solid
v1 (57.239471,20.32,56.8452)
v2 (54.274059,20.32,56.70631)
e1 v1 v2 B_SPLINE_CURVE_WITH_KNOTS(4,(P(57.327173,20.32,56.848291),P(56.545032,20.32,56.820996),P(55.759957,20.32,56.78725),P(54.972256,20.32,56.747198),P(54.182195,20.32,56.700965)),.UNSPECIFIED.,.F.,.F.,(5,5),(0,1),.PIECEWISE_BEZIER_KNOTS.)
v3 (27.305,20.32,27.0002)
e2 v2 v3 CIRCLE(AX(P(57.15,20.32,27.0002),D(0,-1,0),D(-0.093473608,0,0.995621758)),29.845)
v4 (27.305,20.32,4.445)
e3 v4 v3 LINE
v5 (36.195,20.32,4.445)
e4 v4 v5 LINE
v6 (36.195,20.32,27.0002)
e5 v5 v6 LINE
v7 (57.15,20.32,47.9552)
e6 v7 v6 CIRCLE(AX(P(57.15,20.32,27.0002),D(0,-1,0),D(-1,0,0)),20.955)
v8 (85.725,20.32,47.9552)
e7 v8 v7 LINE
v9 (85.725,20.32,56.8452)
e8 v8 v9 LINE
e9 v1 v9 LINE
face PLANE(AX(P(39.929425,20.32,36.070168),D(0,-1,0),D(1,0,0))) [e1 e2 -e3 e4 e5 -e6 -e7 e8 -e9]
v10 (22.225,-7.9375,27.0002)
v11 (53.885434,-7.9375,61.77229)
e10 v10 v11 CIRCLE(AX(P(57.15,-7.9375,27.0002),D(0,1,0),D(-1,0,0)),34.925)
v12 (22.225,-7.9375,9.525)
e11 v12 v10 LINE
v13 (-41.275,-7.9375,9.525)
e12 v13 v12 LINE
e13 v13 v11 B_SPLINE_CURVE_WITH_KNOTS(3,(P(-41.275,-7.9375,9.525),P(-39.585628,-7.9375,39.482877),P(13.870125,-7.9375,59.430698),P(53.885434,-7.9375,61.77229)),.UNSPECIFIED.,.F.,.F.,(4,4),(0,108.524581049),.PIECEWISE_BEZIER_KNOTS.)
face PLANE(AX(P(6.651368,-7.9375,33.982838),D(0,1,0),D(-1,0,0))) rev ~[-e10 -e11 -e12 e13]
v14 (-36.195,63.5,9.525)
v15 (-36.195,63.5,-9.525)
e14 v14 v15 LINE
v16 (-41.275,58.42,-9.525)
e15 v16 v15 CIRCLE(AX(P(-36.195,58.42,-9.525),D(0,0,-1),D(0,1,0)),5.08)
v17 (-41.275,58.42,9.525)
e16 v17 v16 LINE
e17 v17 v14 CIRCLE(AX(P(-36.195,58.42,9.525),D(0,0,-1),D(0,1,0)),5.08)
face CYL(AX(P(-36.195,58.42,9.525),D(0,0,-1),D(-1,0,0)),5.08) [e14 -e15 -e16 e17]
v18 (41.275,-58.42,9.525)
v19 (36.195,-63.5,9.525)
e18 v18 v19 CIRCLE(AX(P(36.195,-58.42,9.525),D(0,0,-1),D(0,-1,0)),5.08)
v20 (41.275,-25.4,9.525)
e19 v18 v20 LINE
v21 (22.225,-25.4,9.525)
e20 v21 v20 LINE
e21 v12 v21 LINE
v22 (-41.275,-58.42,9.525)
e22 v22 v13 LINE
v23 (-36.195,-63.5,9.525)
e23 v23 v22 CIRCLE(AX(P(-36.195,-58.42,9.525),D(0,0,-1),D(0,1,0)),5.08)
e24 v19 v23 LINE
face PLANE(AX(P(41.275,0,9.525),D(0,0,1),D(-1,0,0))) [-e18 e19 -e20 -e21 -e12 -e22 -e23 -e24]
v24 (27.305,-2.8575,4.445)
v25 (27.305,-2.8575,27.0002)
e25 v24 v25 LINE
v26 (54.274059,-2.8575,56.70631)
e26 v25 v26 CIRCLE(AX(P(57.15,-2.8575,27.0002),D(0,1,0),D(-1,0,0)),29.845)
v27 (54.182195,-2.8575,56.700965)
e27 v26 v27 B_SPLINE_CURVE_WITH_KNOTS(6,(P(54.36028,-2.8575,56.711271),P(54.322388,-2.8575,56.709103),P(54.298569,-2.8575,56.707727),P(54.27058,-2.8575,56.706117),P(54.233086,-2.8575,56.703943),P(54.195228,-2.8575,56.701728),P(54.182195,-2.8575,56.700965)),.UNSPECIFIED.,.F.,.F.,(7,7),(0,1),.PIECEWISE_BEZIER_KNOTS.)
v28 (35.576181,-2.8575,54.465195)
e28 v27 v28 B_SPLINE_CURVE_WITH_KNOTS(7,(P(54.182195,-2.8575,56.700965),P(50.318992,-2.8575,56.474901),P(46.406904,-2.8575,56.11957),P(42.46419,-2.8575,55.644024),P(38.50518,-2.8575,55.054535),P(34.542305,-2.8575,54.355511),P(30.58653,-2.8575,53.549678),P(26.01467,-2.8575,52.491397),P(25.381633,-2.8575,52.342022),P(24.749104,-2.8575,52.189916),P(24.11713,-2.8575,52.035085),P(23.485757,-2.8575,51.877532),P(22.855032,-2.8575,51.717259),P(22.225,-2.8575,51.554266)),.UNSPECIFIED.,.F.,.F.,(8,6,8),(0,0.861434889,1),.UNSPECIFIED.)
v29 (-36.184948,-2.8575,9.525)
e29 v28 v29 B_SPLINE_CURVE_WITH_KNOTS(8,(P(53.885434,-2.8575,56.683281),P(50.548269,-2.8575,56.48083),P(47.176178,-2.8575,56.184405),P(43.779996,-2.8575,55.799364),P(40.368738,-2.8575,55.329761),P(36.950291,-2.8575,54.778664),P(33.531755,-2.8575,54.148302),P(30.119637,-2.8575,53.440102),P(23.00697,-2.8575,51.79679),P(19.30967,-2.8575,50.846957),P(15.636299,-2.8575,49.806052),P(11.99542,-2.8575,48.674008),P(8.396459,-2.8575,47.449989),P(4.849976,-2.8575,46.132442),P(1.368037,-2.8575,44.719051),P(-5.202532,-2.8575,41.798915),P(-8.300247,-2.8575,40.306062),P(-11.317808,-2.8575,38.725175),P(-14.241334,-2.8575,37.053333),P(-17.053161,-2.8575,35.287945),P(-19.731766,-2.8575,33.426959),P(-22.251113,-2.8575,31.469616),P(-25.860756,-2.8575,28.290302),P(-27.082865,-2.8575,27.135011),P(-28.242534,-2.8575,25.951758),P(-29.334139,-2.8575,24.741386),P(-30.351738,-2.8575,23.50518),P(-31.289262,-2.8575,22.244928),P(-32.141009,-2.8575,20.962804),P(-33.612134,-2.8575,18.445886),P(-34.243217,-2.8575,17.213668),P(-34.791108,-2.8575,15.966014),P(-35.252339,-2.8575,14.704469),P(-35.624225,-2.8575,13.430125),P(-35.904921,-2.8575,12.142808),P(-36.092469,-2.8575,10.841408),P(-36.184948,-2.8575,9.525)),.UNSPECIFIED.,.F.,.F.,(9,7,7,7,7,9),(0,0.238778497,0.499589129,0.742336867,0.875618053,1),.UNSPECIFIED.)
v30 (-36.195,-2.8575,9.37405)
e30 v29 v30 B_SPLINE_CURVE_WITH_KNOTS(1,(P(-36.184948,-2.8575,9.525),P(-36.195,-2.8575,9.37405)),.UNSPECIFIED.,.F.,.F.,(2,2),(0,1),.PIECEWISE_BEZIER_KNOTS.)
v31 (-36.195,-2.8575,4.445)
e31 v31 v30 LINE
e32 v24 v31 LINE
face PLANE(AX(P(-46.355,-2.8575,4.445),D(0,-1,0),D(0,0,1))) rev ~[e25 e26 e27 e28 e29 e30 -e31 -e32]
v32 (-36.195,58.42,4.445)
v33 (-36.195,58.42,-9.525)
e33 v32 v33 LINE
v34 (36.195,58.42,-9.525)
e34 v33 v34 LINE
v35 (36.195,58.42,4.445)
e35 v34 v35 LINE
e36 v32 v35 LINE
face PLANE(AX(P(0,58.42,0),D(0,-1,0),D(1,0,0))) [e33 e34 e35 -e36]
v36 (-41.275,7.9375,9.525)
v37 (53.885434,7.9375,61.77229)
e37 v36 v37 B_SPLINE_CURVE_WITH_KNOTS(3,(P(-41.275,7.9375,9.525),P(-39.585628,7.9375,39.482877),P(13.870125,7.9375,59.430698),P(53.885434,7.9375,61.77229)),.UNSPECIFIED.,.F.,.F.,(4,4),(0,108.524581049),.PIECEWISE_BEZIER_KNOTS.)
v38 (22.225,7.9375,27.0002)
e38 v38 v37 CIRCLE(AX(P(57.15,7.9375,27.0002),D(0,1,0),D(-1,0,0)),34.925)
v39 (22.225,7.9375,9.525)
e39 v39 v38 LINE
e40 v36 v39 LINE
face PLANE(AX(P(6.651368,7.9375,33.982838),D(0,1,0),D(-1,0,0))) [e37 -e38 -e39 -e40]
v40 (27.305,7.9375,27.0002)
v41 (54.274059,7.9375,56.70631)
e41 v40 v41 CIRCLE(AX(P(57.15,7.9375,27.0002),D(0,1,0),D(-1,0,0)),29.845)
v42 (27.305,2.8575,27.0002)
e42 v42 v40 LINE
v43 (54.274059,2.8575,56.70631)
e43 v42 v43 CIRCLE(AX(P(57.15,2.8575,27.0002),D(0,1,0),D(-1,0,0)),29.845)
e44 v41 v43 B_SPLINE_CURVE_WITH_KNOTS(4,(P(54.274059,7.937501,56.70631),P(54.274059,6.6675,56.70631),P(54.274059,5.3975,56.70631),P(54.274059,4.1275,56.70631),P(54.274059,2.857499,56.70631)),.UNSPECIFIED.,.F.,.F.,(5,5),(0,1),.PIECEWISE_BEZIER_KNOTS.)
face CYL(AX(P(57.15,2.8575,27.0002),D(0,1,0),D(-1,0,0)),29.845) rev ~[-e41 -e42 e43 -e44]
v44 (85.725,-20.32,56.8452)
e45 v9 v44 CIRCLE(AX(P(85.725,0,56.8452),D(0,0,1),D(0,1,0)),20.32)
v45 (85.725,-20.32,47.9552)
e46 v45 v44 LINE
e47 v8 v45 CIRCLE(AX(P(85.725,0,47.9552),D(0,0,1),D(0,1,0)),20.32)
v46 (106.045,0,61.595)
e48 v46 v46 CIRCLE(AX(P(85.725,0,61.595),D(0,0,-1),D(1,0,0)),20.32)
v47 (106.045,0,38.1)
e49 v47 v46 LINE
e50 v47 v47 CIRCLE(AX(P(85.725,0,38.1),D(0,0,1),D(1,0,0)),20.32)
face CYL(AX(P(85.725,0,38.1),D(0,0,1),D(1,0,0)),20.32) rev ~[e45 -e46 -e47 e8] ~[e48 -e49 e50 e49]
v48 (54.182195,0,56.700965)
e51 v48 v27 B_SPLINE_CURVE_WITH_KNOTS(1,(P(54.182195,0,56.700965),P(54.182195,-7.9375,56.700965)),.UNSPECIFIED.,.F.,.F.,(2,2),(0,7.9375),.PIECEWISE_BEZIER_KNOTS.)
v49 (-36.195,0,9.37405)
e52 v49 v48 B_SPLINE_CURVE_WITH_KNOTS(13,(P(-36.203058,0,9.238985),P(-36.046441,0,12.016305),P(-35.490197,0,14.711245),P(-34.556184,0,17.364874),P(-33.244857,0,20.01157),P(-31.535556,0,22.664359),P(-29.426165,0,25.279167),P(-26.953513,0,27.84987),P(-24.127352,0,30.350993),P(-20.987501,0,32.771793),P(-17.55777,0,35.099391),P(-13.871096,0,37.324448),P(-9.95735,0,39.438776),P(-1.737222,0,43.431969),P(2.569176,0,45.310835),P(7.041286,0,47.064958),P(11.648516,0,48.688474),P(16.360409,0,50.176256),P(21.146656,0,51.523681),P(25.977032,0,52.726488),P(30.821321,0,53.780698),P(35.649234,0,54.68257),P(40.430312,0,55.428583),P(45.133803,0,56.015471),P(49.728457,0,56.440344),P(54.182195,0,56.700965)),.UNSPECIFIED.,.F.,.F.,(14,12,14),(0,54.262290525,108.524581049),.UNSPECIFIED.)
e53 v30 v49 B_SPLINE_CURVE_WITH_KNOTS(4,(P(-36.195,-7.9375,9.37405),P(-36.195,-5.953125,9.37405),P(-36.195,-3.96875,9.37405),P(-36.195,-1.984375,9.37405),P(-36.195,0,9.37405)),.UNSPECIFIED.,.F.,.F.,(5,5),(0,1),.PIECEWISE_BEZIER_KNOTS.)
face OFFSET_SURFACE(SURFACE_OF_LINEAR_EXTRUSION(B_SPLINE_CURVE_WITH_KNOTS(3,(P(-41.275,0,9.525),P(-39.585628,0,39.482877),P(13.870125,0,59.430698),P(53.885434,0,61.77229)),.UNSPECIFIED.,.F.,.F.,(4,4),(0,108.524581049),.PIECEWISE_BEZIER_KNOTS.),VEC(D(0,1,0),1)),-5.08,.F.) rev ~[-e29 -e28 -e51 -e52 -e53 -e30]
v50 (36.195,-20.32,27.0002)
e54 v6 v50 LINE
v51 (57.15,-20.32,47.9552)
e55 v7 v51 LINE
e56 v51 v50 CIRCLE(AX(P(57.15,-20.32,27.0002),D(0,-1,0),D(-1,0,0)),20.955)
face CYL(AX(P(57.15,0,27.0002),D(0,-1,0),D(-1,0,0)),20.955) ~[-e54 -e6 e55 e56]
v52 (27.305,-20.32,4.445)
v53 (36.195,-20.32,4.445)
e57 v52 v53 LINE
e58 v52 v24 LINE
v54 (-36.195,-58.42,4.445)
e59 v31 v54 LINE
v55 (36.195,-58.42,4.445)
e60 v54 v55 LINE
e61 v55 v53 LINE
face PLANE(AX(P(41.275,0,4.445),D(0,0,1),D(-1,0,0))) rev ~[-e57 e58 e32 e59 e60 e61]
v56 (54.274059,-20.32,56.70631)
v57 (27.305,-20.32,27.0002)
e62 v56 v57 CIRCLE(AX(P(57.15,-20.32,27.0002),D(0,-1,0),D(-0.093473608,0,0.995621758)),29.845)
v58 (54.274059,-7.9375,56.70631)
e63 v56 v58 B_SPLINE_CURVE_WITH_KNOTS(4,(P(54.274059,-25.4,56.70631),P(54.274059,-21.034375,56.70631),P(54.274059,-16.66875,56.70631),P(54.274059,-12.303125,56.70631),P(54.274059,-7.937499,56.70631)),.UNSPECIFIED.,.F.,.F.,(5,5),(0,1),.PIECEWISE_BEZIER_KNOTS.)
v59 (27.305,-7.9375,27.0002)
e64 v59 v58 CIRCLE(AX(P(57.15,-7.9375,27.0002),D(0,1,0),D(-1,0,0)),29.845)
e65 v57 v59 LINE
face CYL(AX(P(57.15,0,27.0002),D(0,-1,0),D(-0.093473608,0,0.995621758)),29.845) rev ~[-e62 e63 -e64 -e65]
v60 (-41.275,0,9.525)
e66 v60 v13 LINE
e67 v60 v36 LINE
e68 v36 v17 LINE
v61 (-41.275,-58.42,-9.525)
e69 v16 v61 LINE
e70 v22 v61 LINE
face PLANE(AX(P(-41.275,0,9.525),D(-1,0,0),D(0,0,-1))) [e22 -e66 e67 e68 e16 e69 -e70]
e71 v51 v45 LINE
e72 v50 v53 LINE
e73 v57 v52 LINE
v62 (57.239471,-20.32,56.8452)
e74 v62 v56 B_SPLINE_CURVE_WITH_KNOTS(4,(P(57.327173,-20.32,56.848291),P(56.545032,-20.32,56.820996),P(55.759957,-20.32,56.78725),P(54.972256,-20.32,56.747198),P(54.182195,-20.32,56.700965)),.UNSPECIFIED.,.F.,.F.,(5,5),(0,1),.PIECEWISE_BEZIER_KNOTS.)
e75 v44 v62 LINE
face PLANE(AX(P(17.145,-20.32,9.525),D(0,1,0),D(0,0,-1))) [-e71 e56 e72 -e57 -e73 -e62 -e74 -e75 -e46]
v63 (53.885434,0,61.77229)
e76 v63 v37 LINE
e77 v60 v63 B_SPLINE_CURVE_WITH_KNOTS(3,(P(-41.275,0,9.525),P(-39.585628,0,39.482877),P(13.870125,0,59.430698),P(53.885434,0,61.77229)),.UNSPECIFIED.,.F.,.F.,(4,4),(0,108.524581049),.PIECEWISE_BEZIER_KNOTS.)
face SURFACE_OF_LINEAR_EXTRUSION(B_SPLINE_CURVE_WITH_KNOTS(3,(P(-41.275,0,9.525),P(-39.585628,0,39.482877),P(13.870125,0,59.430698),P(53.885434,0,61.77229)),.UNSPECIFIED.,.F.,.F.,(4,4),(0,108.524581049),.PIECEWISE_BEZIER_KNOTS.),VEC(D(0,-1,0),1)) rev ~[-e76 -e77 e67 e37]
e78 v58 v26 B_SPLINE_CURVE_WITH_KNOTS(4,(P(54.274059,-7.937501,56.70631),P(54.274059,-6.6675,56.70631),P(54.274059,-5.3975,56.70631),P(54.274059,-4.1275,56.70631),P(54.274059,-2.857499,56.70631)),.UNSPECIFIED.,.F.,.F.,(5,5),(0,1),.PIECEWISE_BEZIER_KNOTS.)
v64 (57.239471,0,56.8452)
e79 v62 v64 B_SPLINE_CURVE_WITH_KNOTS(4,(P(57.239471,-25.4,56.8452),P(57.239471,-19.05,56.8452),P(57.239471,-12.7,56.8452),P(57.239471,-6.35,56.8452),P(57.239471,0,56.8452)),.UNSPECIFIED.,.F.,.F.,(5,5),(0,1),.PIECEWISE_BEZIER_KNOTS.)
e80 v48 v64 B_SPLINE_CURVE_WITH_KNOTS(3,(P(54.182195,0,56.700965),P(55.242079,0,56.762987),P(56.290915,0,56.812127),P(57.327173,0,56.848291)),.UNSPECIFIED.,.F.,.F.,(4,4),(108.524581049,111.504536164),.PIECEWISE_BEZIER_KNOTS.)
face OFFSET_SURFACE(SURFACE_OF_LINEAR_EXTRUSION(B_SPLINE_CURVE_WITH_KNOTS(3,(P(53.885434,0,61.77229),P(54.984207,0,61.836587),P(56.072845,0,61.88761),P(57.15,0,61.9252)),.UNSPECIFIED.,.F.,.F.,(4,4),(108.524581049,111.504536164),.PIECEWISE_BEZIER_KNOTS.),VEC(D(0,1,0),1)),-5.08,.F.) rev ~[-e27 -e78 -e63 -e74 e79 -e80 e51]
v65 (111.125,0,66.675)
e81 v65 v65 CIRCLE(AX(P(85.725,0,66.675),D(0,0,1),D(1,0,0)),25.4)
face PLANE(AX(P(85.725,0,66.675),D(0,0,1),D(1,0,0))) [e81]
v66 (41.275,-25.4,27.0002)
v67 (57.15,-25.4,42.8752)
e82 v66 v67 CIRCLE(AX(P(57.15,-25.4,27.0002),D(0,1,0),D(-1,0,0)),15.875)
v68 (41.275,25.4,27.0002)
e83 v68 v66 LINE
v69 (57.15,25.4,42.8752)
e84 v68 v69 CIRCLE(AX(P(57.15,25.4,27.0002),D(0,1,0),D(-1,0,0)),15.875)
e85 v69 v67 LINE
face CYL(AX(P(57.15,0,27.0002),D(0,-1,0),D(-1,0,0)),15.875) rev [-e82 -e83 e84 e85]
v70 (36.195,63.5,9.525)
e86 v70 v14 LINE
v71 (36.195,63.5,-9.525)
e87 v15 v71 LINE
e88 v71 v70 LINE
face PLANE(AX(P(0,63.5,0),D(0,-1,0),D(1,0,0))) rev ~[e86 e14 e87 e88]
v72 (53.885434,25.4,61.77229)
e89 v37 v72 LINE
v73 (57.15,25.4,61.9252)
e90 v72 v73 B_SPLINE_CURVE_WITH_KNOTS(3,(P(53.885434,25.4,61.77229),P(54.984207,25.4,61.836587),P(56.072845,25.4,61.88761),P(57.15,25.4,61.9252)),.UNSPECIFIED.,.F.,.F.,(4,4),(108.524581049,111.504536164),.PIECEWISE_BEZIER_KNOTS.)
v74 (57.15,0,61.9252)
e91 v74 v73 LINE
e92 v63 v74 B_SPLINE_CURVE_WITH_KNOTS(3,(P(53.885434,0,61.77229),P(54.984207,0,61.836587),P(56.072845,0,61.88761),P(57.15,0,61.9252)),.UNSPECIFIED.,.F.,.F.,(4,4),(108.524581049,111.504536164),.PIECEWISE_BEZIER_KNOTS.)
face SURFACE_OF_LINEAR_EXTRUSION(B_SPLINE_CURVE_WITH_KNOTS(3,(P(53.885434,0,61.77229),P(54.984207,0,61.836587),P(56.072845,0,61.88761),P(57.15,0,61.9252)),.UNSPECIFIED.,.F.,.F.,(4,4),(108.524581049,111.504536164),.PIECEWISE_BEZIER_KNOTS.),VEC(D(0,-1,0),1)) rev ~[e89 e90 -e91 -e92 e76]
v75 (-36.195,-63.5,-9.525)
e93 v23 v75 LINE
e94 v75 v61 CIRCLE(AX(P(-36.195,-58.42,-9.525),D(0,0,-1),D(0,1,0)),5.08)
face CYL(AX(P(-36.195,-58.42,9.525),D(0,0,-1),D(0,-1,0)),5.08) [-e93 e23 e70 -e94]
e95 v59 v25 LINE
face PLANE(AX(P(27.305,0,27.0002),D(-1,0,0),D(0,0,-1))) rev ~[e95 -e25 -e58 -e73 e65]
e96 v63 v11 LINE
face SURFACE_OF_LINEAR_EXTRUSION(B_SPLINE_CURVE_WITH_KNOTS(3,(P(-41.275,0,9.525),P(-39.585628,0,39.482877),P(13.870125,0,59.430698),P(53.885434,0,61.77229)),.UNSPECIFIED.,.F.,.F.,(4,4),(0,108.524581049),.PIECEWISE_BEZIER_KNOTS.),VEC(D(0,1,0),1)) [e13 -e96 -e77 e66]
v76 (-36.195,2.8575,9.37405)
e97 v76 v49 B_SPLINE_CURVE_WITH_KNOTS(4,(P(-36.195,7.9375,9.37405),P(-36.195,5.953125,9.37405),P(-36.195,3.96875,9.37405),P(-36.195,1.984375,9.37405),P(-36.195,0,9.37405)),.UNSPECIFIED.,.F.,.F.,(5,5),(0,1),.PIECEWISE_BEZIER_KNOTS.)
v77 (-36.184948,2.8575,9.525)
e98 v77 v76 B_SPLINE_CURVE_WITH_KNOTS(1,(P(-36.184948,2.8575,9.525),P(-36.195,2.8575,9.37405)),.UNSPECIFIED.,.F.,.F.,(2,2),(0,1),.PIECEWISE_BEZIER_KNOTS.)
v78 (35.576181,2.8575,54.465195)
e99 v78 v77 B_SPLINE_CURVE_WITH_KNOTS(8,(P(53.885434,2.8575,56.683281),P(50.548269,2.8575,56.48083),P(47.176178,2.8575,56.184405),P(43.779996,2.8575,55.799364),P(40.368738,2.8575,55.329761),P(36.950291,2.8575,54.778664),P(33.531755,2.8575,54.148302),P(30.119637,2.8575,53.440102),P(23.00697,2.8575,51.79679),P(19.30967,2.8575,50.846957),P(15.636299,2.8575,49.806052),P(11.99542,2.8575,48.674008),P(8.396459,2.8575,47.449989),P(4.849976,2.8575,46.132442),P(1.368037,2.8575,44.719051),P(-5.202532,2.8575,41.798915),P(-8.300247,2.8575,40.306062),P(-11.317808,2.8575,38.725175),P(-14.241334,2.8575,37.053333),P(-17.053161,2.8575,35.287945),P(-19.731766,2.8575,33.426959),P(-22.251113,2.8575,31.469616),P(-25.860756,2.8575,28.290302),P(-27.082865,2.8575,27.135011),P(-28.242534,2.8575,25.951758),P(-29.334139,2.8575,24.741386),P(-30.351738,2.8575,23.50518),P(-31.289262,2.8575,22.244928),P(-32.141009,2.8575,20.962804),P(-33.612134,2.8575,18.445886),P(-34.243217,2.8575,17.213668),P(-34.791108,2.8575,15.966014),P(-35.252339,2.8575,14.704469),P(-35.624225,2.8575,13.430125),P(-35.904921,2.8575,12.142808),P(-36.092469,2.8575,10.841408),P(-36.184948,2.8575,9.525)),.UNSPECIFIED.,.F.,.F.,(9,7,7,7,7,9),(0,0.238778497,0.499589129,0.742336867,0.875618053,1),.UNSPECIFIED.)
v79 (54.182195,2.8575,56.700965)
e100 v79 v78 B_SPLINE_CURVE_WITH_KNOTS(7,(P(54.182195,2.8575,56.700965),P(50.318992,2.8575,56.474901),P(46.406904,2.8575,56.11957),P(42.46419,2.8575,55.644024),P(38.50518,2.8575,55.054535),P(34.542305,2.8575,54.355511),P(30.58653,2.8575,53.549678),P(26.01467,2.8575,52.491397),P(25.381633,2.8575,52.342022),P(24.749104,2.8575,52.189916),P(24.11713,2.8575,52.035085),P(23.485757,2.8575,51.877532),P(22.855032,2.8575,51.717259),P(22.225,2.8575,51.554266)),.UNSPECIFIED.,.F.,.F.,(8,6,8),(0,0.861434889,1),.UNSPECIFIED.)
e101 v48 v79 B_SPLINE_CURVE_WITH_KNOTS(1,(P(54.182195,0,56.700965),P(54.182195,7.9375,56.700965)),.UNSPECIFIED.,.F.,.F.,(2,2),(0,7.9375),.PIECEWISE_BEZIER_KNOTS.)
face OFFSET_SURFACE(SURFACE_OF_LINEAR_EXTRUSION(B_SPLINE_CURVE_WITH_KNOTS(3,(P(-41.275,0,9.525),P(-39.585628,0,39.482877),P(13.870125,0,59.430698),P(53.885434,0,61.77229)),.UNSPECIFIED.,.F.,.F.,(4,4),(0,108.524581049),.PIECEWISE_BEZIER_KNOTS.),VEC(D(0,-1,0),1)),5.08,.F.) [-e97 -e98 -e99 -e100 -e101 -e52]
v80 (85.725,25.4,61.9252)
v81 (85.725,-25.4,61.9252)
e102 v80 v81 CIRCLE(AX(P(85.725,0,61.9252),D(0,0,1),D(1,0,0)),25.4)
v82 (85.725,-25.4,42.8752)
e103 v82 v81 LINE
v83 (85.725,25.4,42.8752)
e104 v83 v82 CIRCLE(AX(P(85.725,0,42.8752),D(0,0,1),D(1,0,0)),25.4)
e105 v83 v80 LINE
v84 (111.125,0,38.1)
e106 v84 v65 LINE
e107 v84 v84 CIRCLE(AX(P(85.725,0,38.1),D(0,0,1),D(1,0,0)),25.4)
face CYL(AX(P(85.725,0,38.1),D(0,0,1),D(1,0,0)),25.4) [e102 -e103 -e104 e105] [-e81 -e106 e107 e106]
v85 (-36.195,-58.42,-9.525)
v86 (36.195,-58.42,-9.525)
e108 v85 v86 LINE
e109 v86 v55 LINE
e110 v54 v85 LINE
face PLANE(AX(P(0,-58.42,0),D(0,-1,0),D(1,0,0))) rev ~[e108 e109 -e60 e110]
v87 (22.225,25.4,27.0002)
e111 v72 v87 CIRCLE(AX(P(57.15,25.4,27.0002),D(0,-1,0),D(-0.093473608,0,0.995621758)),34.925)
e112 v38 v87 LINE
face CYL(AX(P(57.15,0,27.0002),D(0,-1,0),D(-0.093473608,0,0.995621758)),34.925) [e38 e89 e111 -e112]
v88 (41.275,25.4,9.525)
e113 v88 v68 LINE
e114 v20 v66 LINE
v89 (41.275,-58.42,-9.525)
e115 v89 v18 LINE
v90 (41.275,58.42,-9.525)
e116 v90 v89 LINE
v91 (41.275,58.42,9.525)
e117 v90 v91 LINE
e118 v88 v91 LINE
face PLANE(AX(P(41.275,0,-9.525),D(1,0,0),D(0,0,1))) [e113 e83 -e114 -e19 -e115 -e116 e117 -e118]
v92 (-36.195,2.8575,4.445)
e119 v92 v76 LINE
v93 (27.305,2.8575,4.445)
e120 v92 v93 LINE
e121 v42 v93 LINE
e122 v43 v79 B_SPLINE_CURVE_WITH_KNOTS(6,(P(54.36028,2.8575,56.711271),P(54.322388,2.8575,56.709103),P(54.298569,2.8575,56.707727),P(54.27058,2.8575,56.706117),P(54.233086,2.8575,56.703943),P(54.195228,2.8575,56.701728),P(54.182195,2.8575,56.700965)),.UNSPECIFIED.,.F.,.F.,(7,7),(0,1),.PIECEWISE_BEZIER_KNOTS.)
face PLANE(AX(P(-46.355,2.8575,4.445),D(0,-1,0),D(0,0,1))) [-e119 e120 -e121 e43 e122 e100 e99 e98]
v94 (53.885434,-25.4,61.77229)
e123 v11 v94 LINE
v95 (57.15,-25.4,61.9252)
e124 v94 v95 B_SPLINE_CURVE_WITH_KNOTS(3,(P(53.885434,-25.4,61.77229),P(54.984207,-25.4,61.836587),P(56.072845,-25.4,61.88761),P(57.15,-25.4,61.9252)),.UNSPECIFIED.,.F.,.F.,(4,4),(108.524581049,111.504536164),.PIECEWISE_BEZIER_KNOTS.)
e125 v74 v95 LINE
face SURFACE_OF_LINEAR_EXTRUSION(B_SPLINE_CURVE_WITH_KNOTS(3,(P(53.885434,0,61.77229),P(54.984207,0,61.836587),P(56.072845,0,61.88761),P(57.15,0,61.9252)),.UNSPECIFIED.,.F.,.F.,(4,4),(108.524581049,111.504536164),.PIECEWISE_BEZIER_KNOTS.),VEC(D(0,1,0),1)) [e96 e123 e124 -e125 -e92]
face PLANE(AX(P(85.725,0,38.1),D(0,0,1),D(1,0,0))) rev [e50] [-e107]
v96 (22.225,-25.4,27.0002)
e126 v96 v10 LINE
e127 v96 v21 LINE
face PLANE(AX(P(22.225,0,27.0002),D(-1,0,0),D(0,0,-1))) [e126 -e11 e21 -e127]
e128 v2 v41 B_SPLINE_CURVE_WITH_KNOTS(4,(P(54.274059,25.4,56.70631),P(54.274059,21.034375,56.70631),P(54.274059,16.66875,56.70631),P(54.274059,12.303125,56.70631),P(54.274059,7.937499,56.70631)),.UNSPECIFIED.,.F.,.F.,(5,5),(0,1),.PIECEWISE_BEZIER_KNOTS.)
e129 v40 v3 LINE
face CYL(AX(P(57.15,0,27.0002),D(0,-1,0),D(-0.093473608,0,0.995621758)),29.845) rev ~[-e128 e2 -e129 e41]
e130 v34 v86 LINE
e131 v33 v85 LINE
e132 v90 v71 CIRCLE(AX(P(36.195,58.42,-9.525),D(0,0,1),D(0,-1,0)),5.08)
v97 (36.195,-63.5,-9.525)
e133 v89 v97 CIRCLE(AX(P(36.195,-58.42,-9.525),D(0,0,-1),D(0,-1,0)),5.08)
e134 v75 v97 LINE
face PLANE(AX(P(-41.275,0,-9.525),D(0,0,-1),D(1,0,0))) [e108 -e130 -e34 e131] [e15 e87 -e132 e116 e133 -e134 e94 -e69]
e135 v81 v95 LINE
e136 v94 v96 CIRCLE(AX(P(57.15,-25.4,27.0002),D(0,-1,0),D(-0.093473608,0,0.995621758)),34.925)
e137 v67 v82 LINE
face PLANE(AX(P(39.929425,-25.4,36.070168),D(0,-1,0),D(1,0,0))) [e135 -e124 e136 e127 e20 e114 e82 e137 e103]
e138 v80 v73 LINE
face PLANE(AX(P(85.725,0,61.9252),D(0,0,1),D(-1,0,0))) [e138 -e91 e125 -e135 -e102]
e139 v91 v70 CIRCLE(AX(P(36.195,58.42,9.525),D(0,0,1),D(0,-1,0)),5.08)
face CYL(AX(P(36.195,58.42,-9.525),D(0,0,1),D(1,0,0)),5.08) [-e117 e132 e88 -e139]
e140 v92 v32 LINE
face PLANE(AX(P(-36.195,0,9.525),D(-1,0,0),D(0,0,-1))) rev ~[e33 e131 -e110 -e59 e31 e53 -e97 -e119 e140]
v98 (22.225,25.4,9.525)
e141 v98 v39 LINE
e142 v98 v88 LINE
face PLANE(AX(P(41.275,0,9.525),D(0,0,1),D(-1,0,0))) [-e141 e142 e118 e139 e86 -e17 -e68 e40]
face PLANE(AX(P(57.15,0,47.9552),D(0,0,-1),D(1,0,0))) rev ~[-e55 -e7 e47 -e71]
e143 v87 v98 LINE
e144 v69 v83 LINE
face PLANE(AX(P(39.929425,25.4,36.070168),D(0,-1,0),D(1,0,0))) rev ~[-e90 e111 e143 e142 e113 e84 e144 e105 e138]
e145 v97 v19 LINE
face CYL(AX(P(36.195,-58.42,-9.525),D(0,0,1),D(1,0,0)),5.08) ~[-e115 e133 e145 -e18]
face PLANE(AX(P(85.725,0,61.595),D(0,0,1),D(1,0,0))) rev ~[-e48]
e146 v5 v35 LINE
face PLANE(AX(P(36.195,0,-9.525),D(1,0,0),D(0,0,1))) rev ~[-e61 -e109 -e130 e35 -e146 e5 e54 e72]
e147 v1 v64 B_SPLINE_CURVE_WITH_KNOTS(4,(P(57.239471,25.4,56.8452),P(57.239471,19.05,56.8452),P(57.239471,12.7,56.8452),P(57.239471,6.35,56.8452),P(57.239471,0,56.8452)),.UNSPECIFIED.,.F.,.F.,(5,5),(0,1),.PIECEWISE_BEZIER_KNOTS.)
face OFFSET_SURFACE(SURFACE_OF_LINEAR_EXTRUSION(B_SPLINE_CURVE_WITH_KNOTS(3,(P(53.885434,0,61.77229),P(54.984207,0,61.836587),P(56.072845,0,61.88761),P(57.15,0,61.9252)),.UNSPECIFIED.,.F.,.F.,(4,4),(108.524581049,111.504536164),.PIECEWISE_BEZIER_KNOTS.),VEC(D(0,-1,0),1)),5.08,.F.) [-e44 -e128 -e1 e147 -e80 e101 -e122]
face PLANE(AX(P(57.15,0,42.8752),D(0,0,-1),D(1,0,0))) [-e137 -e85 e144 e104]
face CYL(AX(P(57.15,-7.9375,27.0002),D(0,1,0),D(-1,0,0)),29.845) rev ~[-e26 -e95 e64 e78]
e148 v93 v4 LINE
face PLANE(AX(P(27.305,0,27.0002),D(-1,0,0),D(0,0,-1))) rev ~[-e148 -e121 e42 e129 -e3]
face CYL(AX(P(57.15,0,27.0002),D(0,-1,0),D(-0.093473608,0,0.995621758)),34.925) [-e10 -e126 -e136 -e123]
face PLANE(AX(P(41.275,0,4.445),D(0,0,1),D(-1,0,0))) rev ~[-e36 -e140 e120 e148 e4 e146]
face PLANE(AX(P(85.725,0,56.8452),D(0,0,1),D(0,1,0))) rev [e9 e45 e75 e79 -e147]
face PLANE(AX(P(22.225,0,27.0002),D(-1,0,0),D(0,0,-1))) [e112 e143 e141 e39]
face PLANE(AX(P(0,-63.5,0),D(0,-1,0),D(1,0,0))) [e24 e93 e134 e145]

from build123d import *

# Parameters (mm, degrees)
F1_DEPTH     = 63.5
F0_W         = 25.4
F0_H         = 19.05
F2_DEPTH     = 25.4
F3_DEPTH     = 7.9375
F5_R         = 5.08
F6_T         = 5.08
F6_T3_DEPTH  = 29.21
F6_T5_DEPTH  = 27.6225
F6_T7_DEPTH  = 73.66
F6_T9_DEPTH  = 27.6352
F6_T11_DEPTH = 27.6225
F6_T14_ANGLE = 84.6365269518
F6_T16_ANGLE = 180.000000001
F6_T18_ANGLE = 180.000000001
F6_T20_ANGLE = 84.6365269518


# Not quite as in the source:
# - a shell that OpenCascade refuses in one call is made with other operations: the cavity is built on its own and cut out


with BuildPart() as f1:
    # F0 (on Front) → F1 (new body, symmetric)
    with BuildSketch(Plane.XZ):
        Polygon((22.225, 9.525), (-41.275, 9.525), (-41.275, -9.525), (41.275, -9.525), (41.275, 9.525), align=None)
    extrude(amount=F1_DEPTH, both=True)

    # F0 (on Front) → F2 (join, symmetric)
    with BuildSketch(Plane.XZ):
        with BuildLine():
            Line((22.225, 27.0002), (22.225, 9.525))
            Line((22.225, 9.525), (41.275, 9.525))
            Line((41.275, 9.525), (41.275, 27.0002))
            ThreePointArc((41.275, 27.0002), (45.9246798487, 38.2255201513), (57.15, 42.8752))
            Line((57.15, 42.8752), (60.325, 42.8752))
            Line((60.325, 42.8752), (60.325, 61.9252))
            Line((60.325, 61.9252), (57.15, 61.9252))
            add(Edge.make_bspline(
                [(53.8854342407, 61.7722898912), (54.9842067368, 61.8365871986), (56.0728453275, 61.8876096574), (57.15, 61.9252)],
                knots=[108.5245810491, 108.5245810491, 108.5245810491, 108.5245810491, 111.5045361635, 111.5045361635, 111.5045361635, 111.5045361635], degree=3))
            ThreePointArc((53.8854342407, 61.7722898912), (31.3258777096, 50.5133948686), (22.225, 27.0002))
        make_face()
        with Locations((73.025, 52.4002)):
            Rectangle(F0_W, F0_H)
    extrude(amount=F2_DEPTH, both=True)

    # F0 (on Front) → F3 (join, symmetric)
    with BuildSketch(Plane.XZ):
        with BuildLine():
            add(Edge.make_bspline(
                [(-41.275, 9.525), (-39.5856284224, 39.4828766469), (13.870125209, 59.4306981306), (53.8854342407, 61.7722898912)],
                knots=[0, 0, 0, 0, 108.5245810491, 108.5245810491, 108.5245810491, 108.5245810491], degree=3))
            Line((-41.275, 9.525), (22.225, 9.525))
            Line((22.225, 9.525), (22.225, 27.0002))
            ThreePointArc((22.225, 27.0002), (31.3258777096, 50.5133948686), (53.8854342407, 61.7722898912))
        make_face()
    extrude(amount=F3_DEPTH, both=True)

    # F0 (on Front) → F4 (revolve)
    with BuildSketch(Plane.XZ):
        Polygon((85.725, 66.675), (85.725, 61.9252), (85.725, 42.8752), (85.725, 38.1), (111.125, 38.1), (111.125, 66.675), align=None)
    revolve(axis=Axis((85.725, 0, 52.3875), (0, 0, 1)))

    # F5
    f5_edges = [f1.edges().sort_by_distance(p)[0] for p in [
        (41.275, -63.5, 0),
        (-41.275, -63.5, 0),
        (41.275, 63.5, 0),
        (-41.275, 63.5, 0),
    ]]
    fillet(f5_edges, radius=F5_R)

    # F6: shell of thickness 5.08, made by hand


with BuildPart() as f6_core1:
    # F6_t2: copy of F1
    add(f1.part)

    # the walls: a layer under each face that stays
    f6_faces = [f6_core1.faces().sort_by_distance(p)[0] for p in [
        (0, 35.71875, 9.525),
        (41.275, 0, 8.7376),
        (32.8083333333, 25.4, 18.2583666667),
        (0, 63.5, 0),
        (22.225, 16.66875, 18.2626),
        (6.3052171204, 7.9375, 35.6486449456),
        (-41.275, 0, 0),
        (45.9246798487, 0, 38.2255201513),
        (32.8083333333, -25.4, 18.2583666667),
        (0, -35.71875, 9.525),
        (31.3258777096, 16.66875, 50.5133948686),
        (61.9125, 16.9333333333, 42.8752),
        (98.425, 21.9970452561, 42.8625),
        (61.9125, 16.9333333333, 61.9252),
        (55.5258238042, 12.7, 61.8587600574),
        (-8.0670094249, 3.96875, 46.0047517779),
        (-8.0670094249, -3.96875, 46.0047517779),
        (0, -63.5, 0),
        (31.3258777096, -16.66875, 50.5133948686),
        (22.225, -16.66875, 18.2626),
        (55.5258238042, -12.7, 61.8587600574),
        (6.3052171204, -7.9375, 35.6486449456),
        (85.725, 0, 66.675),
    ]]
    thicken(f6_faces, amount=-F6_T, mode=Mode.SUBTRACT)

    # F6_s4 → F6_t3 (cut)
    with BuildSketch(Plane.YZ.offset(17.145)):
        Polygon((25.4508, 9.5758), (25.4, 4.445), (20.32, 4.445), (20.32, 9.525), align=None)
        Polygon((-25.4508, 9.5758), (-20.32, 9.525), (-20.32, 4.445), (-25.4, 4.445), align=None)
    extrude(amount=F6_T3_DEPTH, mode=Mode.SUBTRACT)

    # F6_s6 → F6_t5 (cut)
    with BuildSketch(Plane.XZ.offset(-30.48)):
        Polygon((22.1742, 9.5758), (22.225, 4.445), (27.305, 4.445), (27.305, 9.525), align=None)
    extrude(amount=F6_T5_DEPTH, mode=Mode.SUBTRACT)

    # F6_s8 → F6_t7 (cut)
    with BuildSketch(Plane.YZ.offset(-46.355)):
        Polygon((7.9883, 9.5758), (7.9375, 4.445), (2.8575, 4.445), (2.8575, 9.525), align=None)
        Polygon((-7.9883, 9.5758), (-7.9375, 4.445), (-2.8575, 4.445), (-2.8575, 9.525), align=None)
    extrude(amount=F6_T7_DEPTH, mode=Mode.SUBTRACT)

    # F6_s10 → F6_t9 (cut)
    with BuildSketch(Plane.XY.offset(4.445)):
        Polygon((22.1742, 7.9883), (27.305, 7.9375), (27.305, 2.8575), (22.225, 2.8575), align=None)
        Polygon((22.1742, -7.9883), (27.305, -7.9375), (27.305, -2.8575), (22.225, -2.8575), align=None)
    extrude(amount=F6_T9_DEPTH, mode=Mode.SUBTRACT)

    # F6_s12 → F6_t11 (cut)
    with BuildSketch(Plane.XZ.offset(2.8575)):
        Polygon((22.1742, 9.5758), (22.225, 4.445), (27.305, 4.445), (27.305, 9.525), align=None)
    extrude(amount=F6_T11_DEPTH, mode=Mode.SUBTRACT)

    # F6_s13 → F6_t14 (revolve, cut)
    with BuildSketch(Plane.XY.offset(27.0002)):
        Polygon((22.1742, 7.9883), (22.225, 2.8575), (27.305, 2.8575), (27.305, 7.9375), align=None)
    revolve(axis=Axis((57.15, 7.9375, 27.0002), (0, 1, 0)), revolution_arc=F6_T14_ANGLE, mode=Mode.SUBTRACT)

    # F6_s15 → F6_t16 (revolve, cut)
    with BuildSketch(Plane.YZ.offset(85.725)):
        Polygon((25.4508, 42.8244), (25.4, 47.9552), (20.32, 47.9552), (20.32, 42.8752), align=None)
    revolve(axis=Axis((85.725, 0, 42.8752), (0, 0, 1)), revolution_arc=F6_T16_ANGLE, mode=Mode.SUBTRACT)

    # F6_s17 → F6_t18 (revolve, cut)
    with BuildSketch(Plane.YZ.offset(85.725)):
        Polygon((25.4508, 61.976), (20.32, 61.9252), (20.32, 56.8452), (25.4, 56.8452), align=None)
    revolve(axis=Axis((85.725, 0, 61.9252), (0, 0, 1)), revolution_arc=F6_T18_ANGLE, mode=Mode.SUBTRACT)

    # F6_s19 → F6_t20 (revolve, cut)
    with BuildSketch(Plane.XY.offset(27.0002)):
        Polygon((22.1742, -7.9883), (27.305, -7.9375), (27.305, -2.8575), (22.225, -2.8575), align=None)
    revolve(axis=Axis((57.15, -7.9375, 27.0002), (0, 1, 0)), revolution_arc=F6_T20_ANGLE, mode=Mode.SUBTRACT)


with BuildPart() as f1_1:
    add(f1.part)

    # what is left inside the walls is the cavity
    f6_cavity = [f6_core1.part.solids().sort_by_distance(p)[0] for p in [
        (0, 19.473333, -9.4742),
    ]]
    add(f6_cavity, mode=Mode.SUBTRACT)


solid = f1_1.part
